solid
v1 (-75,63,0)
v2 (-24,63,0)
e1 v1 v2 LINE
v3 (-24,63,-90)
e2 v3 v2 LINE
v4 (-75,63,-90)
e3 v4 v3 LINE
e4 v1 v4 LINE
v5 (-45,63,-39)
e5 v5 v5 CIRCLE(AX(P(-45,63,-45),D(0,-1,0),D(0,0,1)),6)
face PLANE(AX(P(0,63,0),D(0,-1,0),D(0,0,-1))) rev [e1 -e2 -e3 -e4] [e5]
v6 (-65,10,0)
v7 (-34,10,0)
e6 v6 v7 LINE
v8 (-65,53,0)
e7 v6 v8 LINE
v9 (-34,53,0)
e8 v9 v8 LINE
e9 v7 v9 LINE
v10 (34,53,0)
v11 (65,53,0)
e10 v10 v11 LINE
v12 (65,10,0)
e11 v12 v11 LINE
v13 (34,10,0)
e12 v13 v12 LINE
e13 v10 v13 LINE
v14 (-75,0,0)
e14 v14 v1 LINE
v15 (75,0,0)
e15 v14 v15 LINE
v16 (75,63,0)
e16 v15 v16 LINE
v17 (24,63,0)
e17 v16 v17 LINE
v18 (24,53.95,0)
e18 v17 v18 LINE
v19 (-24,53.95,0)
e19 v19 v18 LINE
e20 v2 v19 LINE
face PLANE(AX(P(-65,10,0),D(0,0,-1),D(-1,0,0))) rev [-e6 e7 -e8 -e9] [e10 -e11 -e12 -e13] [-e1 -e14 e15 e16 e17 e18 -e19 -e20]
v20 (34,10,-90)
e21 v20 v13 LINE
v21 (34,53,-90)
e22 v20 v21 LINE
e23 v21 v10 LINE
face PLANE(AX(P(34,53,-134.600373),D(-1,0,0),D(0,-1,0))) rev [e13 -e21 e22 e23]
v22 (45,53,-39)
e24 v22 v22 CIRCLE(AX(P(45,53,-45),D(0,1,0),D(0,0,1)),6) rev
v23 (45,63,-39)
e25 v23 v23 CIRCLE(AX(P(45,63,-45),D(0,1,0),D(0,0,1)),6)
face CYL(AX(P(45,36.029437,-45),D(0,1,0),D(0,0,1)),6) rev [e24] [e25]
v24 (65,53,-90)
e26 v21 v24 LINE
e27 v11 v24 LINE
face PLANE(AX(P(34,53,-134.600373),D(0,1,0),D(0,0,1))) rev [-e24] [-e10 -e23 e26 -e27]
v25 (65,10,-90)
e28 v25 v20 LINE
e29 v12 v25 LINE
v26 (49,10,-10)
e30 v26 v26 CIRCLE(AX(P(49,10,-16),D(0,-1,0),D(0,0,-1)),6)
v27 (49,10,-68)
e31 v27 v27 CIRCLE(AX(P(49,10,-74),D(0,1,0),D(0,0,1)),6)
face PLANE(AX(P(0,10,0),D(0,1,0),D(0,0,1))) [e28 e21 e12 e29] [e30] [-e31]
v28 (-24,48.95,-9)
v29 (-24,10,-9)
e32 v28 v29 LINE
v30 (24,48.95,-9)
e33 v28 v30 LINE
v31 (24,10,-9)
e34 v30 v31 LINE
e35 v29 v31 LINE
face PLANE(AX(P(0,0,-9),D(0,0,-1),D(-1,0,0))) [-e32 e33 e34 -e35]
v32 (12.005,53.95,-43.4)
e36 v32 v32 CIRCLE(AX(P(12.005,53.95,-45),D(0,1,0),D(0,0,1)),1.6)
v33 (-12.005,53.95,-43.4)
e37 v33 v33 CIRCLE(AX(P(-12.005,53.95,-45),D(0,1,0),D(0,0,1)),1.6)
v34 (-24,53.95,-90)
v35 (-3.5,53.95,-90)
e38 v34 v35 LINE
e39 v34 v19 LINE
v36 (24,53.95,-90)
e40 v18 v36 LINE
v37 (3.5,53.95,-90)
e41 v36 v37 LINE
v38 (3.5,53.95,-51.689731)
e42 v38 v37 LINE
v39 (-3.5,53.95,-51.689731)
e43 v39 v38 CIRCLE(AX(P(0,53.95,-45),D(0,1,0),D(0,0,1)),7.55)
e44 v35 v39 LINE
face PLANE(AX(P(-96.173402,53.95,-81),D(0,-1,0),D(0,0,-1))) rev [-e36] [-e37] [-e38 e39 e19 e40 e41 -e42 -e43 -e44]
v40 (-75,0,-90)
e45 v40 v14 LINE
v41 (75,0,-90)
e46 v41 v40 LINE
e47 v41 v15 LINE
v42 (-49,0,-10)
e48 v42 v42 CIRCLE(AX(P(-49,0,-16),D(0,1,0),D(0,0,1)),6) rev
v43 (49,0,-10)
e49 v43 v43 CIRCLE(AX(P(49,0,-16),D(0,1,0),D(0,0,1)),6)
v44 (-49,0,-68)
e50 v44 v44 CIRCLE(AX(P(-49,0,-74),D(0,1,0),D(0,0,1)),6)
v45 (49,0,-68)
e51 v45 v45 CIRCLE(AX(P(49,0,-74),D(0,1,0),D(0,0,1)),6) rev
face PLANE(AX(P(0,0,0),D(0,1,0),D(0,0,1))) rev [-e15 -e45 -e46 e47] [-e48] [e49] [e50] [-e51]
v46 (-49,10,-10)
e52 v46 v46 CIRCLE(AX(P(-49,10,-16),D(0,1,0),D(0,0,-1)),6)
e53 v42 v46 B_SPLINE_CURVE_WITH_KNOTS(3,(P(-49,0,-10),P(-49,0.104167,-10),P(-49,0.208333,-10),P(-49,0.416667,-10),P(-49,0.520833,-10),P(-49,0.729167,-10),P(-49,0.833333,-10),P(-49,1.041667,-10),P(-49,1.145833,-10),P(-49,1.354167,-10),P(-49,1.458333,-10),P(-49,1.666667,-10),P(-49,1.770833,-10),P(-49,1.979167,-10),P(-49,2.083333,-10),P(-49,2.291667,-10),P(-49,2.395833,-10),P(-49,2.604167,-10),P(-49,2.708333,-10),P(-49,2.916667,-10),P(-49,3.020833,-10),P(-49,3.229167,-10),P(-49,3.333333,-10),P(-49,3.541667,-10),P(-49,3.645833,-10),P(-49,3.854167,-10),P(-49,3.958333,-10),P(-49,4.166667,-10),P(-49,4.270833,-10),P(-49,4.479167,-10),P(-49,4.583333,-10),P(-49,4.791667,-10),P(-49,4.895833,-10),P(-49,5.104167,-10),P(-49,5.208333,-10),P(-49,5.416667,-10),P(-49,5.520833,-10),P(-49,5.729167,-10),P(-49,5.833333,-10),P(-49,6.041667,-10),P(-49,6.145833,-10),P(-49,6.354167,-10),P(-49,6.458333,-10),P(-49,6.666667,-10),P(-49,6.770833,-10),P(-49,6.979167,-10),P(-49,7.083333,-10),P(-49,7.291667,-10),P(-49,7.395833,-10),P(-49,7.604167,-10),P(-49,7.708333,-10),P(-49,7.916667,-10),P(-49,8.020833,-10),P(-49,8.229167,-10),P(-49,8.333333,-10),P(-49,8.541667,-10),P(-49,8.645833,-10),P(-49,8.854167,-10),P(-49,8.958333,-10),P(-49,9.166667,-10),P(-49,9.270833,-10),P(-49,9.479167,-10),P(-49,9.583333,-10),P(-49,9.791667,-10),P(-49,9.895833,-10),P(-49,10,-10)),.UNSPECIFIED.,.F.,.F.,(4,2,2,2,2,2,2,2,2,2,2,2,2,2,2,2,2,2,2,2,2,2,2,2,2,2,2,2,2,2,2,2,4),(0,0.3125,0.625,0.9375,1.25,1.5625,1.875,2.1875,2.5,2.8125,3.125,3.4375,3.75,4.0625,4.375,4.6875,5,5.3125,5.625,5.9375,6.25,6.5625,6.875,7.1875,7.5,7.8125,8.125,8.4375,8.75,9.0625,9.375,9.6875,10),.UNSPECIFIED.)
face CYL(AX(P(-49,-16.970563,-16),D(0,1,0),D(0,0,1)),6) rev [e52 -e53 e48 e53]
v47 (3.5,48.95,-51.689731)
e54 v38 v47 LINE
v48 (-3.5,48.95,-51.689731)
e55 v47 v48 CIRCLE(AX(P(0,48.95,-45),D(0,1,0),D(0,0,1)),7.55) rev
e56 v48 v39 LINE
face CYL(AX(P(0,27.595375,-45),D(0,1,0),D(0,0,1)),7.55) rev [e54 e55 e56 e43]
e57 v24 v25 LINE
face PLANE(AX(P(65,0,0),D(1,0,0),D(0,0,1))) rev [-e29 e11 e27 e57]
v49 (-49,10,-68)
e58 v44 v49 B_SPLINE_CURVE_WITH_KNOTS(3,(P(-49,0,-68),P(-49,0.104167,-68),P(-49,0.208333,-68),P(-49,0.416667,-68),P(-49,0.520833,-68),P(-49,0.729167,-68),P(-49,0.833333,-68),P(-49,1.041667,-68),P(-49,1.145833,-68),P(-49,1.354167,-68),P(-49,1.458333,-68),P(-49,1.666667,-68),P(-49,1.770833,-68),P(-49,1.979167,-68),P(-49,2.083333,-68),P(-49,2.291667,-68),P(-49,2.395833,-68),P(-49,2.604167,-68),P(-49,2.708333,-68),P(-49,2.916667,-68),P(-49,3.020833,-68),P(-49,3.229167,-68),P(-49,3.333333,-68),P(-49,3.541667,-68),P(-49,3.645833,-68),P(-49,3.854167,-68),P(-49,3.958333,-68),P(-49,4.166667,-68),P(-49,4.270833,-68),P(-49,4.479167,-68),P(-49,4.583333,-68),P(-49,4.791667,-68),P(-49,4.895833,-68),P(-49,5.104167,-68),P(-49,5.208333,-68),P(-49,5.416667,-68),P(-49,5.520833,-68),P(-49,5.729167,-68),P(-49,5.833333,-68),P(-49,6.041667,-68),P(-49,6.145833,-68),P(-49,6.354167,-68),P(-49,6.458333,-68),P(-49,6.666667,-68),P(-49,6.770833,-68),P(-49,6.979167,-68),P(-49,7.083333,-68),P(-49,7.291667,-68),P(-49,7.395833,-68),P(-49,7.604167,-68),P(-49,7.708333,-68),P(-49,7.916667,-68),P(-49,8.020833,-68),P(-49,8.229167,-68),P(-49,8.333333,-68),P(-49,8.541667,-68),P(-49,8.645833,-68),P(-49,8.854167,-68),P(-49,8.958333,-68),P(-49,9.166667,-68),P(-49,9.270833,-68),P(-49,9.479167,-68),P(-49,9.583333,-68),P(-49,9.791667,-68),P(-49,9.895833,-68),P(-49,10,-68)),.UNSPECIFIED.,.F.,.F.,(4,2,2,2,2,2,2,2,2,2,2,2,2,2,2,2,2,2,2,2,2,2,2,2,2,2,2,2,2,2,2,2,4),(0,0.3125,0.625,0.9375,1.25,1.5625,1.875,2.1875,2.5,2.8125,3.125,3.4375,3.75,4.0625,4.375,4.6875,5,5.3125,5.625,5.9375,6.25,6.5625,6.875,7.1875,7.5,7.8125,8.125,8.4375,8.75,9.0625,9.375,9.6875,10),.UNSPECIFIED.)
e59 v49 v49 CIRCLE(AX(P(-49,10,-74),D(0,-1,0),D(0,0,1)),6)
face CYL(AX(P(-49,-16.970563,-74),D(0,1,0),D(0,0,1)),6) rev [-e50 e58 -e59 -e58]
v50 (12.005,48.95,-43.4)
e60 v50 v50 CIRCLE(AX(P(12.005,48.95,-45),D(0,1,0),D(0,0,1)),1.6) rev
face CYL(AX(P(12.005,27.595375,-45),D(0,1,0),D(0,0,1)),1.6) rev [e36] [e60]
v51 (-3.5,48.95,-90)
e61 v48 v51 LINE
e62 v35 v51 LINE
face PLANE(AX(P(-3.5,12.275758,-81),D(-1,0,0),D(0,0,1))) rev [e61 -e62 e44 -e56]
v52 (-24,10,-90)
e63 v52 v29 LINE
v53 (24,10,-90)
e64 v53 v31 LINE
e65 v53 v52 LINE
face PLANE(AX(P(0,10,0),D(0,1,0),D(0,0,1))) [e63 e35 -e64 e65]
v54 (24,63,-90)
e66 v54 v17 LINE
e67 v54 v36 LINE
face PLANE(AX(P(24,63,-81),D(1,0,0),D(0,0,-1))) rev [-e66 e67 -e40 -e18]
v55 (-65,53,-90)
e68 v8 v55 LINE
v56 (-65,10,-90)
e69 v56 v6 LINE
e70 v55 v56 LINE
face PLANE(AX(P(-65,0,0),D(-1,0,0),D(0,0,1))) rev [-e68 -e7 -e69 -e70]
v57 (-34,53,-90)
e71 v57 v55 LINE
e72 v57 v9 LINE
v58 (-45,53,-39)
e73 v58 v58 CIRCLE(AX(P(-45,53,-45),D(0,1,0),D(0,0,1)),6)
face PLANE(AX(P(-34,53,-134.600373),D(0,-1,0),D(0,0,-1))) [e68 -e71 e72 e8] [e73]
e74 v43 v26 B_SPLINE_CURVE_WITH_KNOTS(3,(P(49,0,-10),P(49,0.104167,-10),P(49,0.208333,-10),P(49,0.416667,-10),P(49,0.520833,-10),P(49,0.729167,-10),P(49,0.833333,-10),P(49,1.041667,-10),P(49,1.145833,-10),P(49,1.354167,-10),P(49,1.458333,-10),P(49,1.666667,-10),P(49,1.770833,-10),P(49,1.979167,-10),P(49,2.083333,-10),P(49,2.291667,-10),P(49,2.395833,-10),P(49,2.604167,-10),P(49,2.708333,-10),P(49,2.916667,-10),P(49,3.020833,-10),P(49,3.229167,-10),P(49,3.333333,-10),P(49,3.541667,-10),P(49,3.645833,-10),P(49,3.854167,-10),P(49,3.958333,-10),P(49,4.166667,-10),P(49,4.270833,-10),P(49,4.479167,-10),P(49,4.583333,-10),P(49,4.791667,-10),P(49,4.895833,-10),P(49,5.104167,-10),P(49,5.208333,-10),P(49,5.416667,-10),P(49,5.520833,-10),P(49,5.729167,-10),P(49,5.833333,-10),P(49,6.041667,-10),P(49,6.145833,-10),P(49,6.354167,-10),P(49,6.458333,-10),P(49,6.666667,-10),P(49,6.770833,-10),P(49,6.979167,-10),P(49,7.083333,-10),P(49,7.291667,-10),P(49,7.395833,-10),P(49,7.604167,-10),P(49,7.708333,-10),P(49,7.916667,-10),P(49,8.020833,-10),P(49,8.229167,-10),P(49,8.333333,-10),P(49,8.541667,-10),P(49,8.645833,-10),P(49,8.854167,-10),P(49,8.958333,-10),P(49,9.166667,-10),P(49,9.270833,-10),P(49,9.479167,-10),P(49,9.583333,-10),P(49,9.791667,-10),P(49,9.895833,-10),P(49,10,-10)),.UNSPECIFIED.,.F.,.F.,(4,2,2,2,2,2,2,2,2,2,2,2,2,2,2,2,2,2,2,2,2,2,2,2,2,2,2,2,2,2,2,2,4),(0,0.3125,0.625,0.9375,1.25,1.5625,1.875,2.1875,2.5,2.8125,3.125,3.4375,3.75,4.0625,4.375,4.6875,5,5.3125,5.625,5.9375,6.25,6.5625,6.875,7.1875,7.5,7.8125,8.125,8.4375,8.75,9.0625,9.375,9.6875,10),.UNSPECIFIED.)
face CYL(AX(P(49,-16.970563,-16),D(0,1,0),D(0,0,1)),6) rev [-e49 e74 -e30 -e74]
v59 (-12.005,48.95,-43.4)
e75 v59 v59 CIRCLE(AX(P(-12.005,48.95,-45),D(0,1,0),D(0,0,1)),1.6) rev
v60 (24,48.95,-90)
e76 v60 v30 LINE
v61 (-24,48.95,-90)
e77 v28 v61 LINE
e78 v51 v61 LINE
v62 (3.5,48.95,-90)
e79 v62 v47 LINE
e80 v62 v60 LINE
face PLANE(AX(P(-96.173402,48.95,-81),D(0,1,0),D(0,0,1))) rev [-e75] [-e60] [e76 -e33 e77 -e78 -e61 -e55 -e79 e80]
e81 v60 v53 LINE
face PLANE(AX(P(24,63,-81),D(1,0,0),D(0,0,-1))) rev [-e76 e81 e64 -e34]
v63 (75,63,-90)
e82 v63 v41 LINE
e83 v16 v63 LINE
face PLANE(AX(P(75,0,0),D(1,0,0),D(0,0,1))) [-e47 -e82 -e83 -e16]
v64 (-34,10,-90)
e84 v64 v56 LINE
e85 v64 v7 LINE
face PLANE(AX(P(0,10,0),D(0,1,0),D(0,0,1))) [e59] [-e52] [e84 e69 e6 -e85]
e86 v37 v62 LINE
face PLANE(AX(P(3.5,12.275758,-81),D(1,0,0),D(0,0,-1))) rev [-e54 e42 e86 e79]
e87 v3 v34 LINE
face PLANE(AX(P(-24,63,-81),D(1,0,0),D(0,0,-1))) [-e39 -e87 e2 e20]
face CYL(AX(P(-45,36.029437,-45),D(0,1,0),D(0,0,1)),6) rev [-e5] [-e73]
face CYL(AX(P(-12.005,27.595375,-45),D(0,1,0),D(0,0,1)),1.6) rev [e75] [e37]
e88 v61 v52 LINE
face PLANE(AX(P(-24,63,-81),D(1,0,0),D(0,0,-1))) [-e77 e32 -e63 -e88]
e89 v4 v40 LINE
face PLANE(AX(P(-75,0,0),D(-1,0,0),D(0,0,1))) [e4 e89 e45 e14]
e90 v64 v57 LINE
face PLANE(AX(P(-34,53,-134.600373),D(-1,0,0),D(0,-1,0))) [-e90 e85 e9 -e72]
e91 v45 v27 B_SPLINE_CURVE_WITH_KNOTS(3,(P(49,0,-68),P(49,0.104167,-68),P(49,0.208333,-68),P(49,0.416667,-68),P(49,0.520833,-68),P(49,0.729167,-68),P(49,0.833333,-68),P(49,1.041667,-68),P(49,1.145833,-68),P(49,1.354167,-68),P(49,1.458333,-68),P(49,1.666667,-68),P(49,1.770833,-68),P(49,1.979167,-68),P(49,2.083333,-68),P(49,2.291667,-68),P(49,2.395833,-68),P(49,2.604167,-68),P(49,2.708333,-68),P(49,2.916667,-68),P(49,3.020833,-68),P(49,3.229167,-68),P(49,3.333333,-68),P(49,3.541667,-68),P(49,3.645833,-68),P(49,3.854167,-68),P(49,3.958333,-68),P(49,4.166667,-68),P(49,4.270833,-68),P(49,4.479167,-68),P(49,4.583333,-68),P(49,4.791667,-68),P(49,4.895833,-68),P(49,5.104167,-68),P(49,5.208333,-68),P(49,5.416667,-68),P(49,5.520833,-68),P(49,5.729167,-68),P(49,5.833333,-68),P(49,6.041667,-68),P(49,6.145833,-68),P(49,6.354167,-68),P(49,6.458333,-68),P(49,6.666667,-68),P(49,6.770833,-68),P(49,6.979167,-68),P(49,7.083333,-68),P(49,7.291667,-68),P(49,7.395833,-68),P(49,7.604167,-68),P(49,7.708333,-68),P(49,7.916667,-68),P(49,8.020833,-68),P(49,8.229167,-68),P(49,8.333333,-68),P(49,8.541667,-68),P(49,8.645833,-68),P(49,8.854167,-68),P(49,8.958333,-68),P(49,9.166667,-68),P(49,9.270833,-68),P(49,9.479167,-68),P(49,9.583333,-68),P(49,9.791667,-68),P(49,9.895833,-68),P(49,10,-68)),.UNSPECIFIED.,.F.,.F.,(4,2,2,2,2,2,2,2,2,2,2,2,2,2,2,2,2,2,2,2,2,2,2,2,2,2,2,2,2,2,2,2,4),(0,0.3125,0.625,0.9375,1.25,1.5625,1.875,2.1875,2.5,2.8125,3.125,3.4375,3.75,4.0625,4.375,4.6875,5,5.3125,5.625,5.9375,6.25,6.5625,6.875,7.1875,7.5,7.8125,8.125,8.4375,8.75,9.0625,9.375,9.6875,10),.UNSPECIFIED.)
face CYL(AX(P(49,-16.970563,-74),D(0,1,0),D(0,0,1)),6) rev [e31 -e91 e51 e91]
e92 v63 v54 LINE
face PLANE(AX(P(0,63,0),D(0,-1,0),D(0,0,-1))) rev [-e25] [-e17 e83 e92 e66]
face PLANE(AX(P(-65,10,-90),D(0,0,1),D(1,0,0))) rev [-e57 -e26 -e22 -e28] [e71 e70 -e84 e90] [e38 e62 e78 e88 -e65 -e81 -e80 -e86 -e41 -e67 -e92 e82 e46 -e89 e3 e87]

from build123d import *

# Parameters (mm, degrees)
SKETCH2_W           = 130
SKETCH2_H           = 90
BOSS_EXTRUDE1_DEPTH = 10
SKETCH3_W           = 42
SKETCH3_H           = 72
BOSS_EXTRUDE3_DEPTH = 53
SKETCH4_W           = 32
SKETCH4_H           = 43
CUT_EXTRUDE1_DEPTH  = 72
SKETCH5_R           = 6
CUT_EXTRUDE2_DEPTH  = 10
SKETCH6_W           = 72
SKETCH6_H           = 5
BOSS_EXTRUDE4_DEPTH = 48
SKETCH7_R           = 7.55
SKETCH7_R_2         = 1.6
CUT_EXTRUDE3_DEPTH  = 5
SKETCH8_R           = 6
CUT_EXTRUDE4_DEPTH  = 10
MIRROR2_OUTLINE_R   = 6
MIRROR2_DEPTH       = 10
SKETCH9_W           = 68
SKETCH9_H           = 43.95
BOSS_EXTRUDE5_DEPTH = 9
SKETCH10_W          = 7
SKETCH10_H          = 36
CUT_EXTRUDE5_DEPTH  = 5
BOSS_EXTRUDE6_DEPTH = 9
BOSS_EXTRUDE7_DEPTH = 9
SKETCH13_W          = 90
SKETCH13_H          = 63
BOSS_EXTRUDE8_DEPTH = 10


# Read off the part's stored shape, not the designer's step: Mirror2
with BuildPart() as part:
    # Sketch2 → Boss-Extrude1 (new body)
    with BuildSketch(Plane(origin=(0, 0, 0), x_dir=(1, 0, 0), z_dir=(0, 1, 0))):
        with Locations((0, 45)):
            Rectangle(SKETCH2_W, SKETCH2_H)
    extrude(amount=BOSS_EXTRUDE1_DEPTH)

    # Sketch3 → Boss-Extrude3 (add)
    with BuildSketch(Plane(origin=(0, 10, 0), x_dir=(1, 0, 0), z_dir=(0, 1, 0))):
        with Locations((45, 45)):
            Rectangle(SKETCH3_W, SKETCH3_H)
    boss_extrude3 = extrude(amount=BOSS_EXTRUDE3_DEPTH)

    # Sketch4 → Cut-Extrude1 (cut)
    with BuildSketch(Plane.XY.offset(-9)):
        with Locations((50, 31.5)):
            Rectangle(SKETCH4_W, SKETCH4_H)
    cut_extrude1 = extrude(amount=-CUT_EXTRUDE1_DEPTH, mode=Mode.SUBTRACT)

    # Sketch5 → Cut-Extrude2 (cut)
    with BuildSketch(Plane(origin=(0, 63, 0), x_dir=(1, 0, 0), z_dir=(0, 1, 0))):
        with Locations(Location((45, 45, 0), (0, 0, 270))):
            Circle(SKETCH5_R)
    cut_extrude2 = extrude(amount=-CUT_EXTRUDE2_DEPTH, mode=Mode.SUBTRACT)

    # Mirror1: Boss-Extrude3, Cut-Extrude1, Cut-Extrude2 across Right Plane
    add(boss_extrude3.mirror(Plane(origin=(0, 0, 0), x_dir=(0, 0, -1), z_dir=(1, 0, 0))))
    add(cut_extrude1.mirror(Plane(origin=(0, 0, 0), x_dir=(0, 0, -1), z_dir=(1, 0, 0))), mode=Mode.SUBTRACT)
    add(cut_extrude2.mirror(Plane(origin=(0, 0, 0), x_dir=(0, 0, -1), z_dir=(1, 0, 0))), mode=Mode.SUBTRACT)

    # Sketch6 → Boss-Extrude4 (add)
    with BuildSketch(Plane.ZY.offset(-24)):
        with Locations((-45, 51.45)):
            Rectangle(SKETCH6_W, SKETCH6_H)
    extrude(amount=BOSS_EXTRUDE4_DEPTH)

    # Sketch7 → Cut-Extrude3 (cut)
    with BuildSketch(Plane(origin=(0, 53.95, 0), x_dir=(1, 0, 0), z_dir=(0, 1, 0))):
        with Locations(Location((0, 45, 0), (0, 0, 270))):
            Circle(SKETCH7_R)
        with Locations(Location((12.005, 45, 0), (0, 0, 270))):
            Circle(SKETCH7_R_2)
        with Locations(Location((-12.005, 45, 0), (0, 0, 270))):
            Circle(SKETCH7_R_2)
    extrude(amount=-CUT_EXTRUDE3_DEPTH, mode=Mode.SUBTRACT)

    # Sketch8 → Cut-Extrude4 (cut)
    with BuildSketch(Plane(origin=(0, 10, 0), x_dir=(1, 0, 0), z_dir=(0, 1, 0))):
        with Locations(Location((49, 74, 0), (0, 0, 270))):
            Circle(SKETCH8_R)
    extrude(amount=-CUT_EXTRUDE4_DEPTH, mode=Mode.SUBTRACT)

    # Mirror2 outline → Mirror2 (cut)
    with BuildSketch(Plane(origin=(0, 0, 0), x_dir=(1, 0, 0), z_dir=(0, 1, 0))):
        with Locations((49, 16)):
            Circle(MIRROR2_OUTLINE_R)
        with Locations((-49, 74)):
            Circle(MIRROR2_OUTLINE_R)
        with Locations((-49, 16)):
            Circle(MIRROR2_OUTLINE_R)
    extrude(amount=MIRROR2_DEPTH, mode=Mode.SUBTRACT)

    # Sketch9 → Boss-Extrude5 (add)
    with BuildSketch(Plane.XY.offset(-9)):
        with Locations((0, 31.975)):
            Rectangle(SKETCH9_W, SKETCH9_H)
    extrude(amount=BOSS_EXTRUDE5_DEPTH)

    # Sketch10 → Cut-Extrude5 (cut)
    with BuildSketch(Plane(origin=(0, 53.95, 0), x_dir=(1, 0, 0), z_dir=(0, 1, 0))):
        with Locations((0, 63)):
            Rectangle(SKETCH10_W, SKETCH10_H)
    extrude(amount=-CUT_EXTRUDE5_DEPTH, mode=Mode.SUBTRACT)

    # Sketch11 → Boss-Extrude6 (add)
    with BuildSketch(Plane.XY.offset(-9)):
        Polygon((-66, 63), (-66, 53), (-34, 53), (-34, 53.95), (-24, 53.95), (-24, 63), align=None)
    boss_extrude6 = extrude(amount=BOSS_EXTRUDE6_DEPTH)

    # Mirror3: Boss-Extrude6 across Right Plane
    add(boss_extrude6.mirror(Plane(origin=(0, 0, 0), x_dir=(0, 0, -1), z_dir=(1, 0, 0))))

    # Sketch12 → Boss-Extrude7 (add)
    with BuildSketch(Plane(origin=(0, 0, -81), x_dir=(-1, 0, 0), z_dir=(0, 0, -1))):
        Polygon((-66, 63), (-66, 53), (-34, 53), (-34, 10), (-24, 10), (-24, 48.95), (-3.5, 48.95), (-3.5, 53.95), (-24, 53.95), (-24, 63), align=None)
    boss_extrude7 = extrude(amount=BOSS_EXTRUDE7_DEPTH)

    # Mirror4: Boss-Extrude7 across Right Plane
    add(boss_extrude7.mirror(Plane(origin=(0, 0, 0), x_dir=(0, 0, -1), z_dir=(1, 0, 0))))

    # Sketch13 → Boss-Extrude8 (add)
    with BuildSketch(Plane.ZY.offset(65)):
        with Locations((-45, 31.5)):
            Rectangle(SKETCH13_W, SKETCH13_H)
    boss_extrude8 = extrude(amount=BOSS_EXTRUDE8_DEPTH)

    # Mirror5: Boss-Extrude8 across Right Plane
    add(boss_extrude8.mirror(Plane(origin=(0, 0, 0), x_dir=(0, 0, -1), z_dir=(1, 0, 0))))


solid = part.part
